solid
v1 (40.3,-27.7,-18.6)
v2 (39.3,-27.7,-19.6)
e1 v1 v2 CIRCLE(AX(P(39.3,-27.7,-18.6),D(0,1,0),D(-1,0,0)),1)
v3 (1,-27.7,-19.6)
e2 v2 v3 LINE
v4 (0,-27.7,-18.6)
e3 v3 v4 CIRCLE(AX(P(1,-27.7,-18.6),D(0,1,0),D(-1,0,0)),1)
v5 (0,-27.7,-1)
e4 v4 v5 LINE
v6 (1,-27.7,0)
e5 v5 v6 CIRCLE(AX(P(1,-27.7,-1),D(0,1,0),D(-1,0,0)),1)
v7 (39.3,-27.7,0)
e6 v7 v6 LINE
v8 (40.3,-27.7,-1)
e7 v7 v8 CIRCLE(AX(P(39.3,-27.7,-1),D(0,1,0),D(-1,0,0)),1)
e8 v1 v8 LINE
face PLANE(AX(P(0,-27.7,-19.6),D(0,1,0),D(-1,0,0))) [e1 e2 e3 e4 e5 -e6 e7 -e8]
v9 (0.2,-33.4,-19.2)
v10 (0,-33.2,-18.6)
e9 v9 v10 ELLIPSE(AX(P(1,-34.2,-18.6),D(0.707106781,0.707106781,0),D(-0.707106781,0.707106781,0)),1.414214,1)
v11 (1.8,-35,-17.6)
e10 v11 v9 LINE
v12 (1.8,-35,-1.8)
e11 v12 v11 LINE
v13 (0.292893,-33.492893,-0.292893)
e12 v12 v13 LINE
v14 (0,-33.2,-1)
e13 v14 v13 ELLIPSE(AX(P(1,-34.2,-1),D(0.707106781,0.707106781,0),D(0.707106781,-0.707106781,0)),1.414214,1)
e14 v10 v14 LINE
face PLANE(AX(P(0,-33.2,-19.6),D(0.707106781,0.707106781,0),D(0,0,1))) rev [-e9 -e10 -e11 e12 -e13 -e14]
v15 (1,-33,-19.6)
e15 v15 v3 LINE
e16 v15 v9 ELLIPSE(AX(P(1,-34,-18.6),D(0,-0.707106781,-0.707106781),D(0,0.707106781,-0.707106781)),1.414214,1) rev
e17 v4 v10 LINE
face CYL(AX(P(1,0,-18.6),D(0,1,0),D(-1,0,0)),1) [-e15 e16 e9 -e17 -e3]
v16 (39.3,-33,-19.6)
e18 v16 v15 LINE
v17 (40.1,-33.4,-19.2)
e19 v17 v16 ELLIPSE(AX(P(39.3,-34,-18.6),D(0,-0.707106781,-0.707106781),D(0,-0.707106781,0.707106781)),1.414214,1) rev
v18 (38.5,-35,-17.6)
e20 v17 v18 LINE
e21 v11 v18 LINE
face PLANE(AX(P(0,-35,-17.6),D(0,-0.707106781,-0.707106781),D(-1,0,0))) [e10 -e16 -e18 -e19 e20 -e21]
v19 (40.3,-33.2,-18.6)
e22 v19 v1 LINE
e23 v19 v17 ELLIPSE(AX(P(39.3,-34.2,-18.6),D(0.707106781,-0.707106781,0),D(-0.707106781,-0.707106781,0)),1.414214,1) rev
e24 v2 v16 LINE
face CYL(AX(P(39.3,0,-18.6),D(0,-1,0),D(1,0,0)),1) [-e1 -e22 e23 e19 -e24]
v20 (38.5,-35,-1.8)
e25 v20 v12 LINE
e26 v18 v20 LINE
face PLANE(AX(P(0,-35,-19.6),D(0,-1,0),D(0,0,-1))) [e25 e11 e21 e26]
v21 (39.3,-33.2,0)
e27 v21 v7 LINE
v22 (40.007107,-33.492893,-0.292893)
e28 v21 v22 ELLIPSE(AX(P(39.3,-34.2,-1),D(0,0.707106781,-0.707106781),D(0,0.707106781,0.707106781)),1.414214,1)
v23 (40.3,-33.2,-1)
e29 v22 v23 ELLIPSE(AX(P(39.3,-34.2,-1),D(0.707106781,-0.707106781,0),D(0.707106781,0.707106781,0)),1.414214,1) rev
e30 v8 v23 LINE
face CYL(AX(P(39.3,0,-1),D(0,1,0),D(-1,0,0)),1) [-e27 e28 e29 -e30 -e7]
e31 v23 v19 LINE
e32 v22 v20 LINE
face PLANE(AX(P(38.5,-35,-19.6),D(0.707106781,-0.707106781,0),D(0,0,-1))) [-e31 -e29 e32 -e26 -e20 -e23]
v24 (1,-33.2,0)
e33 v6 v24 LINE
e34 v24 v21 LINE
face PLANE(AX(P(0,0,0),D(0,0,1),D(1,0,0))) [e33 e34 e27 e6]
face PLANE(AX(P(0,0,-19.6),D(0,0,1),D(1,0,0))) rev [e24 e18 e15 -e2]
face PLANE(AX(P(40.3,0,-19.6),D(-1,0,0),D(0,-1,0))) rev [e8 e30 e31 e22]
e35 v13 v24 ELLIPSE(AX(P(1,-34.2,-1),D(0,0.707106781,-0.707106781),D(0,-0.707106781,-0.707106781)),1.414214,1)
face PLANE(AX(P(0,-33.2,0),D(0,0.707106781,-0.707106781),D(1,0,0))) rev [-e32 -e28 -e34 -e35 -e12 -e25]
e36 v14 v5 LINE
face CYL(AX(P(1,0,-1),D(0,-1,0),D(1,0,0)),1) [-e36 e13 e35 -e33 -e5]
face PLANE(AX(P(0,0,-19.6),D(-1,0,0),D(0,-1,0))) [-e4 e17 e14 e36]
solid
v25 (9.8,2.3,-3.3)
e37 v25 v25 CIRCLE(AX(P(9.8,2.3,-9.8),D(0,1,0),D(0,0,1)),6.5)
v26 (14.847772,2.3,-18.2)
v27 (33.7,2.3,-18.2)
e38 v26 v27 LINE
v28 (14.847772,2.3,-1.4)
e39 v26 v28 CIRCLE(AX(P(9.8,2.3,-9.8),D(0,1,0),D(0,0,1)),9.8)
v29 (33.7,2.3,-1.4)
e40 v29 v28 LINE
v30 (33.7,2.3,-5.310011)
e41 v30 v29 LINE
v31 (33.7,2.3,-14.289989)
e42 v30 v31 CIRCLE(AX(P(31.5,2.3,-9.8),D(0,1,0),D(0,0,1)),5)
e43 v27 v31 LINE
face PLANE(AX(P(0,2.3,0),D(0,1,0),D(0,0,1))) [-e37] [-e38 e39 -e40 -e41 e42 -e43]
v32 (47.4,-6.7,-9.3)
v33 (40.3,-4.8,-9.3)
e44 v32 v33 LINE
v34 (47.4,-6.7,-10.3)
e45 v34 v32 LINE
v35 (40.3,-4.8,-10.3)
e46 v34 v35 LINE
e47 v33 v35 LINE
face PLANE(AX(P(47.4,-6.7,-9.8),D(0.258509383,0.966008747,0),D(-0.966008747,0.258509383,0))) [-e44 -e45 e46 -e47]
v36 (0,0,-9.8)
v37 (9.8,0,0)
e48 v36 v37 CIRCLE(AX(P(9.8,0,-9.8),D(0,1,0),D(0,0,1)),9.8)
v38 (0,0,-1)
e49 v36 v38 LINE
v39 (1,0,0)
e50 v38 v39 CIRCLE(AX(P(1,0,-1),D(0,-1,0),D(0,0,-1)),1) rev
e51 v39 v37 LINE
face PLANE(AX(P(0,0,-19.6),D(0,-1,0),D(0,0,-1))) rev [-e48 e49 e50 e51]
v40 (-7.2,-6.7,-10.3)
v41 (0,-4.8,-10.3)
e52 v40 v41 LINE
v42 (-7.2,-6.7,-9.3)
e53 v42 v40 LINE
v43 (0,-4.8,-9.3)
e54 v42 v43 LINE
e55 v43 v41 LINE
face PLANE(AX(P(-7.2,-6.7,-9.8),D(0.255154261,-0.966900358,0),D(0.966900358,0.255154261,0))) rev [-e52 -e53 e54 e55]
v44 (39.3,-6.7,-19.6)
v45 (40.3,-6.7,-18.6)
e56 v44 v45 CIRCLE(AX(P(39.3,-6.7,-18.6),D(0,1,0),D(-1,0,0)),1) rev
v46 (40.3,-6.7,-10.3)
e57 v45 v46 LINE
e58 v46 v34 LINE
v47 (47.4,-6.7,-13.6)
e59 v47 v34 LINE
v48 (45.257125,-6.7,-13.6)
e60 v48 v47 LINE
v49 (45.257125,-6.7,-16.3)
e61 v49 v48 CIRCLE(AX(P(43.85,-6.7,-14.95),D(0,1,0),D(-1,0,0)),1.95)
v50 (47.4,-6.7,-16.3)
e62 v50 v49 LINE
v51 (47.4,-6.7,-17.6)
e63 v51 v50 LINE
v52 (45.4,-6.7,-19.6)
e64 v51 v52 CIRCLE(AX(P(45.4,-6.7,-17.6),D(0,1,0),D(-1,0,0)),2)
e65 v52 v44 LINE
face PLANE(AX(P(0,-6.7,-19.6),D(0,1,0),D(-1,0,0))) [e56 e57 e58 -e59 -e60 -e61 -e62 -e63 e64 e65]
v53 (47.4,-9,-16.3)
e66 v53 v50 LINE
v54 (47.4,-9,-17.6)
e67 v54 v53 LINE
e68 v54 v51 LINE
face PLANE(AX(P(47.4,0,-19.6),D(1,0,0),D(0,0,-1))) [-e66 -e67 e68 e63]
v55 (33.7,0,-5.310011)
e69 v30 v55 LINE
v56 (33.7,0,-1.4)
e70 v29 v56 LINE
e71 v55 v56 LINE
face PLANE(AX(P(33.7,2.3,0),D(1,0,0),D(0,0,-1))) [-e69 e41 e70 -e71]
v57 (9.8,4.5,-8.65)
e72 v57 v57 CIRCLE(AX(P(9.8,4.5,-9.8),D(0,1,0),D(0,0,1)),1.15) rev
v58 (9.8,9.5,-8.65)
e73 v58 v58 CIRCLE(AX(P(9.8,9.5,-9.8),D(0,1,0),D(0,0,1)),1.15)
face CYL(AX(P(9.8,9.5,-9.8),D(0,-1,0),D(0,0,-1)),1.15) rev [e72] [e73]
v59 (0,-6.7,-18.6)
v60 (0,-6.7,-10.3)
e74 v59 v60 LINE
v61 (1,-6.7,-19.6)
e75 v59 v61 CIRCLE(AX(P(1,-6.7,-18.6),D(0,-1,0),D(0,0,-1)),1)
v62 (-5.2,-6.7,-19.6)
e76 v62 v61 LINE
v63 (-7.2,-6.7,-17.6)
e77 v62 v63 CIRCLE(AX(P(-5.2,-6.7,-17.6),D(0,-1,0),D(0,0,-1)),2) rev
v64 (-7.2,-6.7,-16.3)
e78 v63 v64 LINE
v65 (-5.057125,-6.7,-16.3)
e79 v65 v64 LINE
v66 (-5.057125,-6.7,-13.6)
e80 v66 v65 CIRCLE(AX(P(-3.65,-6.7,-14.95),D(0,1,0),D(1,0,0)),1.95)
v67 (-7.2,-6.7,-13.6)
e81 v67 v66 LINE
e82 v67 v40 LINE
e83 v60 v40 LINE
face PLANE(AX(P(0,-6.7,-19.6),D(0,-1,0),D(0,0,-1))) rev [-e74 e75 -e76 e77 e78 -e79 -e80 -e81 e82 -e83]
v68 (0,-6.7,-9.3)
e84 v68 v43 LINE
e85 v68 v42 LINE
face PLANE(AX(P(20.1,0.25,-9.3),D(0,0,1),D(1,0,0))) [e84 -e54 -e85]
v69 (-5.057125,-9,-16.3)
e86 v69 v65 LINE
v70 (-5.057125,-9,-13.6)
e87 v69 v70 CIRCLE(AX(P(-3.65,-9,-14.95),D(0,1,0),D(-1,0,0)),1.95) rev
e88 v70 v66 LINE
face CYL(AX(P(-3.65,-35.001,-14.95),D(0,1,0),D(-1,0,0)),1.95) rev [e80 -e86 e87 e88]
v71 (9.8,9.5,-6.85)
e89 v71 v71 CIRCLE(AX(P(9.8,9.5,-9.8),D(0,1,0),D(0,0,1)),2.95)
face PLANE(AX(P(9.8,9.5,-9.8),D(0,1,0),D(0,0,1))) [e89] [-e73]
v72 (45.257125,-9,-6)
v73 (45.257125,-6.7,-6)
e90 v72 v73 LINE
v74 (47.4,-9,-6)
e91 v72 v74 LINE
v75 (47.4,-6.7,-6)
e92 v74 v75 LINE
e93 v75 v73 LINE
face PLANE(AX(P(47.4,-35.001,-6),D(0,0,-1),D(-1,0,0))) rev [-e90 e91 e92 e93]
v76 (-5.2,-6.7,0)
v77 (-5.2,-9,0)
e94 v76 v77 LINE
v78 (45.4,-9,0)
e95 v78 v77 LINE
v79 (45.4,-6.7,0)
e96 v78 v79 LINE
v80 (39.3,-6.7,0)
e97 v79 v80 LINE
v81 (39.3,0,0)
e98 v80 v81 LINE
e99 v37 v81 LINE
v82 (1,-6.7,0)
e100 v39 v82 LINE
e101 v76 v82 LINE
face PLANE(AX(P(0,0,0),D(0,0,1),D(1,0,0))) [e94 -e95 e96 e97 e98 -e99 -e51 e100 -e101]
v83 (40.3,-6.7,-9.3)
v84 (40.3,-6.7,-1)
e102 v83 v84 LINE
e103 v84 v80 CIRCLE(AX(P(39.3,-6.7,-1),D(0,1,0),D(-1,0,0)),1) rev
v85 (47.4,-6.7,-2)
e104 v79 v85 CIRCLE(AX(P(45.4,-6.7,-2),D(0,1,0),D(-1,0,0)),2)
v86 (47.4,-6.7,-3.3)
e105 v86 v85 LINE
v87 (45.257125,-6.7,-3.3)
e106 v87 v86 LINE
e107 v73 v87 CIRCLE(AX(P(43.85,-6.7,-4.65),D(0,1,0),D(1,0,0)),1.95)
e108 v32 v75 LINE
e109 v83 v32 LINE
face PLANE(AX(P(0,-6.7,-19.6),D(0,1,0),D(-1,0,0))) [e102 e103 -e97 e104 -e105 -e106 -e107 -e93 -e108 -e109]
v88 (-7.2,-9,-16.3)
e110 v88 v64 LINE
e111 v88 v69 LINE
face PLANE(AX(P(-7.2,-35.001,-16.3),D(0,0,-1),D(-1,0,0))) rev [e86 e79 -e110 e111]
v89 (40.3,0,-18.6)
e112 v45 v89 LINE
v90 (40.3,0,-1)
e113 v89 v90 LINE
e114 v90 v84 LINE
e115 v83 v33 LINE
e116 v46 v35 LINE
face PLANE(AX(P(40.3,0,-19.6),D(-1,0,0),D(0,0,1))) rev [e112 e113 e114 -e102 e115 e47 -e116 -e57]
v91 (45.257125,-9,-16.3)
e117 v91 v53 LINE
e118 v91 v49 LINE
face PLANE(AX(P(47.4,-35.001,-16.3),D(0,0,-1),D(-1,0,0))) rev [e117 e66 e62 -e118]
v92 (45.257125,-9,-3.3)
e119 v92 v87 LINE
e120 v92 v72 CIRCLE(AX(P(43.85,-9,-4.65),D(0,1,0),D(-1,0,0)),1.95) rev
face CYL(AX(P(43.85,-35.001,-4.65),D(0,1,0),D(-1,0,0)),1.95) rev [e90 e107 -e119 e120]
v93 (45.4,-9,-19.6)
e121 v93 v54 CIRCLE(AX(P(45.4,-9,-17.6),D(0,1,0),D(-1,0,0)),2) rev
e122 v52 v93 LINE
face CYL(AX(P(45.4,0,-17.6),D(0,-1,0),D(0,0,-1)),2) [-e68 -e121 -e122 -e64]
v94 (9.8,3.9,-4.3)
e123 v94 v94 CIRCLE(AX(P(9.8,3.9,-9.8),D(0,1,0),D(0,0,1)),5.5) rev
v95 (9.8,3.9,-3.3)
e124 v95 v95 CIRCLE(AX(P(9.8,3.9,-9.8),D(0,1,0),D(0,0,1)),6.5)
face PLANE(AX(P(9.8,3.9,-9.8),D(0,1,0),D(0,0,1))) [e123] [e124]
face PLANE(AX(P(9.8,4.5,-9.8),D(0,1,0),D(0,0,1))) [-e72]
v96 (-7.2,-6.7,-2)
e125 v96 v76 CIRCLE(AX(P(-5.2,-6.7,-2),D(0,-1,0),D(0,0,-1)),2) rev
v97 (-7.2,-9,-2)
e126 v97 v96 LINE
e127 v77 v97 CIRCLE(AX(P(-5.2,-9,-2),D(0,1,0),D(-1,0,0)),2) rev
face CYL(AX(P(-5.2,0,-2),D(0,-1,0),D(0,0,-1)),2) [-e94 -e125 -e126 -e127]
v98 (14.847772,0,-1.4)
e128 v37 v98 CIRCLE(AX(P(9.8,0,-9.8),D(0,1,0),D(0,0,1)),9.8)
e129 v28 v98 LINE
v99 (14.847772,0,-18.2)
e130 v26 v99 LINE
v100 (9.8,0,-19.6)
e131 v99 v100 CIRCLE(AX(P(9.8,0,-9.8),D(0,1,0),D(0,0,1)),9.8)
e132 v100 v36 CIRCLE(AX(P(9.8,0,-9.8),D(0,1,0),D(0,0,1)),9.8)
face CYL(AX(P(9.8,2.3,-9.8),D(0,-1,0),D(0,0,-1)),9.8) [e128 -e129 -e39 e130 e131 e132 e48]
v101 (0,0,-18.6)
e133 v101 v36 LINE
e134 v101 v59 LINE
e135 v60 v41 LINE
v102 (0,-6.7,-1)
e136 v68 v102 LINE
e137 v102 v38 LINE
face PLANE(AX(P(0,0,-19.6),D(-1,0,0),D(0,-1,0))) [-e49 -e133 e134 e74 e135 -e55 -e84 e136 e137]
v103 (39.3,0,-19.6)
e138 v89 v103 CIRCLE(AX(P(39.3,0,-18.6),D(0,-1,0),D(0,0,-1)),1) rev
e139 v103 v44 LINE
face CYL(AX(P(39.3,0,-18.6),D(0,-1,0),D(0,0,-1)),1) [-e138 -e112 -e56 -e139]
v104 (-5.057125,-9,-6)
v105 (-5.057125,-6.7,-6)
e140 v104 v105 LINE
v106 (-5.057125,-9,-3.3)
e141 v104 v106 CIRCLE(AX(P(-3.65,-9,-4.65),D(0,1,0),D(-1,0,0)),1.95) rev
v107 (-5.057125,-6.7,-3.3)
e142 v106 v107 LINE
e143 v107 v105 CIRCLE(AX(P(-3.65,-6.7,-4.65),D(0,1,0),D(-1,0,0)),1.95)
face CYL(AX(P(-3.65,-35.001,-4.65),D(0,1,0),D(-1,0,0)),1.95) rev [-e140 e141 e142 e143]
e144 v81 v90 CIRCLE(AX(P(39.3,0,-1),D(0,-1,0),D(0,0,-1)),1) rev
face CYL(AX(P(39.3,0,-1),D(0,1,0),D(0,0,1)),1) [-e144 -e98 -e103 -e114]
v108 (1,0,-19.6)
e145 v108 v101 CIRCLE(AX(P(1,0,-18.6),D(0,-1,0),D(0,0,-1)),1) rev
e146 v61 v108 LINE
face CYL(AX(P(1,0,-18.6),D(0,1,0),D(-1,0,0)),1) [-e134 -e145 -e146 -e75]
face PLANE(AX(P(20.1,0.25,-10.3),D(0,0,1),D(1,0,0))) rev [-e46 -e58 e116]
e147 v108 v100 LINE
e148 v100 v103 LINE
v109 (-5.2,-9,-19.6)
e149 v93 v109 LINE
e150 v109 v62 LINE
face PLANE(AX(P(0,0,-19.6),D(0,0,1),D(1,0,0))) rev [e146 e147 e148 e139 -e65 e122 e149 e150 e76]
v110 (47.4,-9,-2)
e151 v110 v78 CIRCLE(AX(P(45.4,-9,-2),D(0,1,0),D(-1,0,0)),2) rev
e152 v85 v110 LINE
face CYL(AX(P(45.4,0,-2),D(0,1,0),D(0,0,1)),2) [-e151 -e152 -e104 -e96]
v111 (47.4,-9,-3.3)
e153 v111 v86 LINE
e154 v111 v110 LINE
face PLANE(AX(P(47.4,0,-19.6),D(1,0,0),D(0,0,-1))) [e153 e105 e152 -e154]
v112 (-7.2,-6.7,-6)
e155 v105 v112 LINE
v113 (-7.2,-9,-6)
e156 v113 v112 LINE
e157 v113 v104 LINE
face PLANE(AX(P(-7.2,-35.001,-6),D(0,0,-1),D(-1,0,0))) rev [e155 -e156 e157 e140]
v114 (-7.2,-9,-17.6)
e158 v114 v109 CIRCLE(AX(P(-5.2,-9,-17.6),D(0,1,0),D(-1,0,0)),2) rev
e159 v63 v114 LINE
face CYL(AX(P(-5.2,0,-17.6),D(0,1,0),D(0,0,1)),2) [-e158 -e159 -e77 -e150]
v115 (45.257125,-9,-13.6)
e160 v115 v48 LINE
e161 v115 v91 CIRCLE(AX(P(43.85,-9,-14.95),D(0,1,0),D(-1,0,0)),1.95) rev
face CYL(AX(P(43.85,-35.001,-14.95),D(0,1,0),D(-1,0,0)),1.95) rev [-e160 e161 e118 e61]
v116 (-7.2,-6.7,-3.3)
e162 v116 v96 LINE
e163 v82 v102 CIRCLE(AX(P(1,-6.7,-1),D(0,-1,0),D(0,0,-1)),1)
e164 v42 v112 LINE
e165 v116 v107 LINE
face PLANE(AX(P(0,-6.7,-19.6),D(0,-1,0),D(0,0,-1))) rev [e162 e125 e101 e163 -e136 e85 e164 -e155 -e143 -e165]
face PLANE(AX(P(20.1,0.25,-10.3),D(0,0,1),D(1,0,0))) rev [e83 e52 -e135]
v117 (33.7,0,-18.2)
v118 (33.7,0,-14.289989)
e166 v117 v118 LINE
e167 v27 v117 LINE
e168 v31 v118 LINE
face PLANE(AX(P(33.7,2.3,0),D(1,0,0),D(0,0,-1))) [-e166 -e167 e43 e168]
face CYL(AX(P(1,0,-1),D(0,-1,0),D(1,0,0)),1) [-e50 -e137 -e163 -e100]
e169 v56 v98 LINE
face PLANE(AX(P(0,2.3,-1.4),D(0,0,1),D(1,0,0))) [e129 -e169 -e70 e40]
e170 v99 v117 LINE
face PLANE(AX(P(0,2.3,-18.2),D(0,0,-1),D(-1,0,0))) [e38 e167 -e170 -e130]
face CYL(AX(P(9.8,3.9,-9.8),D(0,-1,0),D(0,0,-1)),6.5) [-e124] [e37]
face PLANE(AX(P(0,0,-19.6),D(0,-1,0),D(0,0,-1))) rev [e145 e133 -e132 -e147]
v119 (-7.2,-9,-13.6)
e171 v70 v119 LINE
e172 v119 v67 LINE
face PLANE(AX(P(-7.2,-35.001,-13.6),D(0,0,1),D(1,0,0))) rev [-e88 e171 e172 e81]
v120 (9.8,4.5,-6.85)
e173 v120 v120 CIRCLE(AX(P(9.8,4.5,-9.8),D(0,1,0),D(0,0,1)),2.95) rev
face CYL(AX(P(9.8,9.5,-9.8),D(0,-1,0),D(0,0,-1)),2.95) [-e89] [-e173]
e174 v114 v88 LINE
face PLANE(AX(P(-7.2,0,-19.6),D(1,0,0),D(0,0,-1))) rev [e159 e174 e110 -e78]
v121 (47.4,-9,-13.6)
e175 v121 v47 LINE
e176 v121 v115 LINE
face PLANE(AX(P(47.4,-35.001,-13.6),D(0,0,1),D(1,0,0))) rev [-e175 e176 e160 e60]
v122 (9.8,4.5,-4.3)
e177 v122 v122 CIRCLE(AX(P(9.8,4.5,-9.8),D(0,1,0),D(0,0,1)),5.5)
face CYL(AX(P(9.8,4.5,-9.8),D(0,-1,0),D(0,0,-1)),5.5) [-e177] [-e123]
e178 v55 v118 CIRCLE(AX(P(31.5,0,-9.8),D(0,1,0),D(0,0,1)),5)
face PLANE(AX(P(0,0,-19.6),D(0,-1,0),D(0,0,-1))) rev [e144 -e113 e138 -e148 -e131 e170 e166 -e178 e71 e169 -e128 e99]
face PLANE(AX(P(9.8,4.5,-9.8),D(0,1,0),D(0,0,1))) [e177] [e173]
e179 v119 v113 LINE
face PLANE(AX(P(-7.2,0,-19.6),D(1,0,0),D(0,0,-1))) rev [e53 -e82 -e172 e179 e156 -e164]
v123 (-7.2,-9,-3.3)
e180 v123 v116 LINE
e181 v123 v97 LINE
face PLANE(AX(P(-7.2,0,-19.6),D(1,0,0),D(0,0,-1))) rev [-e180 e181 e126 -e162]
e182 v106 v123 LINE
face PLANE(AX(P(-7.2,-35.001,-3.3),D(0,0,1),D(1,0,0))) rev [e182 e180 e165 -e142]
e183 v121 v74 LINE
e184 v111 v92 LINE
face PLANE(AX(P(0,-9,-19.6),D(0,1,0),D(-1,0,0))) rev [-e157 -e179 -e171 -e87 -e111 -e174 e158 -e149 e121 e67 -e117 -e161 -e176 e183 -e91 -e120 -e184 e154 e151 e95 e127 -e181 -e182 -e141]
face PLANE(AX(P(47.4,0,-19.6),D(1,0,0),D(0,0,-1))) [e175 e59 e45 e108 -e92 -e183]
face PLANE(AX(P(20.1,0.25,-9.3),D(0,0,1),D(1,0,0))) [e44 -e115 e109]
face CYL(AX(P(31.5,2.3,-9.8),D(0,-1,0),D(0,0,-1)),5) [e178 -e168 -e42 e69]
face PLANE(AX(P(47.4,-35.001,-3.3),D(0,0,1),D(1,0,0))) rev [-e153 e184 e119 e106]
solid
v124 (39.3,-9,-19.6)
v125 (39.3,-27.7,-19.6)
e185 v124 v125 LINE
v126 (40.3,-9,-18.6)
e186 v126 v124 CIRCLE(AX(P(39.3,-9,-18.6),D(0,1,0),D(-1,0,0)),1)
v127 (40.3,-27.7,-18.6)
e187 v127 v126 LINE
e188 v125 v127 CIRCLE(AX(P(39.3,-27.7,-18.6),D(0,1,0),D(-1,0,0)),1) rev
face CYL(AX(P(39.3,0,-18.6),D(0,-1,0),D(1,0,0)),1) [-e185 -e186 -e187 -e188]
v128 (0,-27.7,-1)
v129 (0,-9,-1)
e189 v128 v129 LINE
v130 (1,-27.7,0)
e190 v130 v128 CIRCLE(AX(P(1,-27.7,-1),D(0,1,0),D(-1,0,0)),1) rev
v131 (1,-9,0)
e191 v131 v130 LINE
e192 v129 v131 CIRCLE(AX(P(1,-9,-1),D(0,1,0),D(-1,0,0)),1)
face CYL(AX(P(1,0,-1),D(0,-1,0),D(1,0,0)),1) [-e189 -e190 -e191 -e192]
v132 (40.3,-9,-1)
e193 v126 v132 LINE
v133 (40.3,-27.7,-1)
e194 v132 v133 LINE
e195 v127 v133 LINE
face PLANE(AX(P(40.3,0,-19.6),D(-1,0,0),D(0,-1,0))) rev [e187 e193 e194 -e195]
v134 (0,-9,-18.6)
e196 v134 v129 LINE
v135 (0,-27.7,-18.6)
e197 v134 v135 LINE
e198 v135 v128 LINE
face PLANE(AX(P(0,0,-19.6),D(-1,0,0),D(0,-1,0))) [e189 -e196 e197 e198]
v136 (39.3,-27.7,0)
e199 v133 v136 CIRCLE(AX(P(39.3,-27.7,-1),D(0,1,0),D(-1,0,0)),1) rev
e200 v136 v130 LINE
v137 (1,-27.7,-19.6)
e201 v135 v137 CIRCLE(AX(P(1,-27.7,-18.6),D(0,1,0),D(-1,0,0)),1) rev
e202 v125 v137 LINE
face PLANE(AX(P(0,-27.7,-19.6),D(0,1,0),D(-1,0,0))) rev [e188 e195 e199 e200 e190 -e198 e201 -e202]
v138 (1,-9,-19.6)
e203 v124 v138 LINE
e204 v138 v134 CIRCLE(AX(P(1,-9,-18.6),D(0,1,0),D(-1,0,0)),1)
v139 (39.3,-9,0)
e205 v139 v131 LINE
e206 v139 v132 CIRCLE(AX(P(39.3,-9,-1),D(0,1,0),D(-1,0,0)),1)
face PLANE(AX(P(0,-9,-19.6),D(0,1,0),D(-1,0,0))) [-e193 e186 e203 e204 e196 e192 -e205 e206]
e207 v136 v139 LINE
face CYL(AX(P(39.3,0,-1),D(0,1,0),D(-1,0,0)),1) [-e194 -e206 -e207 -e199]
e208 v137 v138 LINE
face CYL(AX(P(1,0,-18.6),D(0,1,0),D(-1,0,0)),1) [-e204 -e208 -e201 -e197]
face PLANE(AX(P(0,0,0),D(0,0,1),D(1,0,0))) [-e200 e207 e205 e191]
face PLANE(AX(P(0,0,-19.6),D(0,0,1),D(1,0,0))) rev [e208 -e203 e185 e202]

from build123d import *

# Parameters (mm, degrees)
SALIENTE_EXTRUIR1_DEPTH = 19.6
CROQUIS1_3_W            = 40.3
CROQUIS1_3_H            = 18.7
SALIENTE_EXTRUIR2_DEPTH = 19.6
CROQUIS1_4_W            = 40.3
CROQUIS1_4_H            = 7.3
SALIENTE_EXTRUIR3_DEPTH = 19.6
REDONDEO1_R             = 2
REDONDEO2_R             = 1
REDONDEO3_R             = 1
REDONDEO4_R             = 1
CHAFL_N1_SIZE           = 2
CHAFL_N2_SIZE           = 1.8
CHAFL_N3_SIZE           = 1.8
CROQUIS2_R              = 6.5
SALIENTE_EXTRUIR4_DEPTH = 2.3
CROQUIS2_3_R            = 6.5
SALIENTE_EXTRUIR5_DEPTH = 3.9
CROQUIS2_5_R            = 5.5
SALIENTE_EXTRUIR6_DEPTH = 4.5
CROQUIS2_6_R            = 2.95
CROQUIS2_6_R_2          = 1.15
SALIENTE_EXTRUIR7_DEPTH = 9.5
CORTAR_EXTRUIR1_DEPTH   = 2.3
NERVIO21_REACH          = 61.731
CROQUIS4_WALL_W         = 128.81195782
CROQUIS4_WALL_H         = 1
NERVIO24_REACH          = 61.731
CROQUIS5_WALL_W         = 128.908603566
CROQUIS5_WALL_H         = 1


with BuildPart() as part:
    # Croquis1 → Saliente-Extruir1 (new body)
    with BuildSketch(Plane.XY):
        Polygon((40.3, -9), (0, -9), (-7.2, -9), (-7.2, -6.7), (0, -6.7), (0, 0), (40.3, 0), (40.3, -6.7), (47.4, -6.7), (47.4, -9), align=None)
    extrude(amount=-SALIENTE_EXTRUIR1_DEPTH)

    # Redondeo1
    redondeo1_edges = [part.edges().sort_by_distance(p)[0] for p in [
        (-7.2, -7.85, 0),
        (47.4, -7.85, -19.6),
        (47.4, -7.85, 0),
        (-7.2, -7.85, -19.6),
    ]]
    fillet(redondeo1_edges, radius=REDONDEO1_R)

    # Redondeo4
    redondeo4_edges = [part.edges().sort_by_distance(p)[0] for p in [
        (0, -3.35, 0),
        (40.3, -3.35, 0),
        (40.3, -3.35, -19.6),
        (0, -3.35, -19.6),
    ]]
    fillet(redondeo4_edges, radius=REDONDEO4_R)

    # Croquis2 → Saliente-Extruir4 (add)
    with BuildSketch(Plane(origin=(0, 0, 0), x_dir=(1, 0, 0), z_dir=(0, 1, 0))):
        with BuildLine():
            Line((33.7, 5.310011136), (33.7, 1.4))
            Line((33.7, 1.4), (14.847771786, 1.4))
            ThreePointArc((14.847771786, 1.4), (0, 9.8), (14.847771786, 18.2))
            Line((14.847771786, 18.2), (33.7, 18.2))
            Line((33.7, 18.2), (33.7, 14.289988864))
            ThreePointArc((33.7, 14.289988864), (36.5, 9.8), (33.7, 5.310011136))
        make_face()
        with Locations(Location((9.8, 9.8, 0), (0, 0, 270))):
            Circle(CROQUIS2_R, mode=Mode.SUBTRACT)
    extrude(amount=SALIENTE_EXTRUIR4_DEPTH)

    # Croquis2<3> → Saliente-Extruir5 (add)
    with BuildSketch(Plane(origin=(0, 0, 0), x_dir=(1, 0, 0), z_dir=(0, 1, 0))):
        with Locations(Location((9.8, 9.8, 0), (0, 0, 270))):
            Circle(CROQUIS2_3_R)
    extrude(amount=SALIENTE_EXTRUIR5_DEPTH)

    # Croquis2<5> → Saliente-Extruir6 (add)
    with BuildSketch(Plane(origin=(0, 0, 0), x_dir=(1, 0, 0), z_dir=(0, 1, 0))):
        with Locations(Location((9.8, 9.8, 0), (0, 0, 270))):
            Circle(CROQUIS2_5_R)
    extrude(amount=SALIENTE_EXTRUIR6_DEPTH)

    # Croquis2<6> → Saliente-Extruir7 (add)
    with BuildSketch(Plane(origin=(0, 0, 0), x_dir=(1, 0, 0), z_dir=(0, 1, 0))):
        with Locations(Location((9.8, 9.8, 0), (0, 0, 270))):
            Circle(CROQUIS2_6_R)
        with Locations(Location((9.8, 9.8, 0), (0, 0, 270))):
            Circle(CROQUIS2_6_R_2, mode=Mode.SUBTRACT)
    extrude(amount=SALIENTE_EXTRUIR7_DEPTH)

    # Croquis3 → Cortar-Extruir1 (cut)
    with BuildSketch(Plane(origin=(0, -6.7, 0), x_dir=(1, 0, 0), z_dir=(0, 1, 0))):
        with BuildLine():
            Line((47.4, 16.3), (47.4, 13.6))
            Line((47.4, 13.6), (45.257124728, 13.6))
            ThreePointArc((45.257124728, 13.6), (41.9, 14.95), (45.257124728, 16.3))
            Line((45.257124728, 16.3), (47.4, 16.3))
        make_face()
        with BuildLine():
            Line((47.4, 3.3), (45.257124728, 3.3))
            ThreePointArc((45.257124728, 3.3), (41.9, 4.65), (45.257124728, 6))
            Line((45.257124728, 6), (47.4, 6))
            Line((47.4, 6), (47.4, 3.3))
        make_face()
        with BuildLine():
            Line((-7.2, 3.3), (-7.2, 6))
            Line((-7.2, 6), (-5.057124728, 6))
            ThreePointArc((-5.057124728, 6), (-1.7, 4.65), (-5.057124728, 3.3))
            Line((-5.057124728, 3.3), (-7.2, 3.3))
        make_face()
        with BuildLine():
            Line((-7.2, 16.3), (-5.057124728, 16.3))
            ThreePointArc((-5.057124728, 16.3), (-1.7, 14.95), (-5.057124728, 13.6))
            Line((-5.057124728, 13.6), (-7.2, 13.6))
            Line((-7.2, 13.6), (-7.2, 16.3))
        make_face()
    extrude(amount=-CORTAR_EXTRUIR1_DEPTH, mode=Mode.SUBTRACT)

    # Croquis4 wall → Nervio21 (add, up to next)
    with BuildSketch(Plane(origin=(43.85, -5.75, -9.8), x_dir=(-0.966008746817, 0.258509382951, 0), z_dir=(-0.258509382951, -0.966008746817, 0)), mode=Mode.PRIVATE) as nervio21_sk1:
        Rectangle(CROQUIS4_WALL_W, CROQUIS4_WALL_H)
    nervio21_tool1 = extrude(nervio21_sk1.sketch, amount=NERVIO21_REACH, mode=Mode.PRIVATE) - part.part
    add(nervio21_tool1.solids().sort_by_distance((43.85, -5.75, -9.8))[0])

    # Croquis5 wall → Nervio24 (add, up to next)
    with BuildSketch(Plane(origin=(-3.6, -5.75, -9.8), x_dir=(0.966900358349, 0.255154261231, 0), z_dir=(-0.255154261231, 0.966900358349, 0)), mode=Mode.PRIVATE) as nervio24_sk1:
        Rectangle(CROQUIS5_WALL_W, CROQUIS5_WALL_H)
    nervio24_tool1 = extrude(nervio24_sk1.sketch, amount=-NERVIO24_REACH, mode=Mode.PRIVATE) - part.part
    add(nervio24_tool1.solids().sort_by_distance((-3.6, -5.75, -9.8))[0])


with BuildPart() as body_2:
    # Croquis1<3> → Saliente-Extruir2 (new body)
    with BuildSketch(Plane.XY):
        with Locations((20.15, -18.35)):
            Rectangle(CROQUIS1_3_W, CROQUIS1_3_H)
    extrude(amount=-SALIENTE_EXTRUIR2_DEPTH)

    # Redondeo2
    redondeo2_edges = [body_2.edges().sort_by_distance(p)[0] for p in [
        (0, -18.35, -19.6),
        (0, -18.35, 0),
        (40.3, -18.35, 0),
        (40.3, -18.35, -19.6),
    ]]
    fillet(redondeo2_edges, radius=REDONDEO2_R)


with BuildPart() as body_3:
    # Croquis1<4> → Saliente-Extruir3 (new body)
    with BuildSketch(Plane.XY):
        with Locations((20.15, -31.35)):
            Rectangle(CROQUIS1_4_W, CROQUIS1_4_H)
    extrude(amount=-SALIENTE_EXTRUIR3_DEPTH)

    # Redondeo3
    redondeo3_edges = [body_3.edges().sort_by_distance(p)[0] for p in [
        (0, -31.35, -19.6),
        (40.3, -31.35, -19.6),
        (0, -31.35, 0),
        (40.3, -31.35, 0),
    ]]
    fillet(redondeo3_edges, radius=REDONDEO3_R)

    # Chaflán1
    # the kernel refuses this chamfer: 2 mm, written as the material it takes off along each edge
    with BuildSketch(Plane(origin=(-4.143365976, -35, -19.6), x_dir=(0, -0.027495876610585647, 0.9996219169112968), z_dir=(1, 0, 0))) as chafl_n1_piece_1:
        Polygon((CHAFL_N1_SIZE * 0.999621916911, -CHAFL_N1_SIZE * 0.0274958766106), (-CHAFL_N1_SIZE * 0.0274958766106, -CHAFL_N1_SIZE * 0.999621916911), (0, 0), align=None)
    extrude(amount=48.586731952, mode=Mode.SUBTRACT)

    # Chaflán2
    # the kernel refuses this chamfer: 1.8 mm, written as the material it takes off along each edge
    with BuildSketch(Plane(origin=(0, -35, 3.629029378), x_dir=(-0.02749587661058661, 0.9996219169112966, 0), z_dir=(0, 0, -1))) as chafl_n2_piece_1:
        Polygon((CHAFL_N2_SIZE * 0.999621916911, CHAFL_N2_SIZE * 0.0274958766106), (-CHAFL_N2_SIZE * 0.0274958766106, CHAFL_N2_SIZE * 0.999621916911), (0, 0), align=None)
    extrude(amount=25.858058757, mode=Mode.SUBTRACT)

    # Chaflán3
    # the kernel refuses this chamfer: 1.8 mm, written as the material it takes off along each edge
    with BuildSketch(Plane(origin=(40.3, -35, 3.629029378), x_dir=(-0.9996219169112969, -0.02749587661058457, 0), z_dir=(0, 0, -1))) as chafl_n3_piece_1:
        Polygon((CHAFL_N3_SIZE * 0.999621916911, CHAFL_N3_SIZE * 0.0274958766106), (-CHAFL_N3_SIZE * 0.0274958766106, CHAFL_N3_SIZE * 0.999621916911), (0, 0), align=None)
    extrude(amount=25.858058757, mode=Mode.SUBTRACT)
    with BuildSketch(Plane(origin=(-2.829029378, -35, 0), x_dir=(0, 0.9996219169112966, 0.02749587661058649), z_dir=(1, 0, 0))) as chafl_n3_piece_2:
        Polygon((CHAFL_N3_SIZE * 0.999621916911, -CHAFL_N3_SIZE * 0.0274958766106), (-CHAFL_N3_SIZE * 0.0274958766106, -CHAFL_N3_SIZE * 0.999621916911), (0, 0), align=None)
    extrude(amount=46.758058757, mode=Mode.SUBTRACT)


solid = Compound([part.part, body_2.part, body_3.part])
